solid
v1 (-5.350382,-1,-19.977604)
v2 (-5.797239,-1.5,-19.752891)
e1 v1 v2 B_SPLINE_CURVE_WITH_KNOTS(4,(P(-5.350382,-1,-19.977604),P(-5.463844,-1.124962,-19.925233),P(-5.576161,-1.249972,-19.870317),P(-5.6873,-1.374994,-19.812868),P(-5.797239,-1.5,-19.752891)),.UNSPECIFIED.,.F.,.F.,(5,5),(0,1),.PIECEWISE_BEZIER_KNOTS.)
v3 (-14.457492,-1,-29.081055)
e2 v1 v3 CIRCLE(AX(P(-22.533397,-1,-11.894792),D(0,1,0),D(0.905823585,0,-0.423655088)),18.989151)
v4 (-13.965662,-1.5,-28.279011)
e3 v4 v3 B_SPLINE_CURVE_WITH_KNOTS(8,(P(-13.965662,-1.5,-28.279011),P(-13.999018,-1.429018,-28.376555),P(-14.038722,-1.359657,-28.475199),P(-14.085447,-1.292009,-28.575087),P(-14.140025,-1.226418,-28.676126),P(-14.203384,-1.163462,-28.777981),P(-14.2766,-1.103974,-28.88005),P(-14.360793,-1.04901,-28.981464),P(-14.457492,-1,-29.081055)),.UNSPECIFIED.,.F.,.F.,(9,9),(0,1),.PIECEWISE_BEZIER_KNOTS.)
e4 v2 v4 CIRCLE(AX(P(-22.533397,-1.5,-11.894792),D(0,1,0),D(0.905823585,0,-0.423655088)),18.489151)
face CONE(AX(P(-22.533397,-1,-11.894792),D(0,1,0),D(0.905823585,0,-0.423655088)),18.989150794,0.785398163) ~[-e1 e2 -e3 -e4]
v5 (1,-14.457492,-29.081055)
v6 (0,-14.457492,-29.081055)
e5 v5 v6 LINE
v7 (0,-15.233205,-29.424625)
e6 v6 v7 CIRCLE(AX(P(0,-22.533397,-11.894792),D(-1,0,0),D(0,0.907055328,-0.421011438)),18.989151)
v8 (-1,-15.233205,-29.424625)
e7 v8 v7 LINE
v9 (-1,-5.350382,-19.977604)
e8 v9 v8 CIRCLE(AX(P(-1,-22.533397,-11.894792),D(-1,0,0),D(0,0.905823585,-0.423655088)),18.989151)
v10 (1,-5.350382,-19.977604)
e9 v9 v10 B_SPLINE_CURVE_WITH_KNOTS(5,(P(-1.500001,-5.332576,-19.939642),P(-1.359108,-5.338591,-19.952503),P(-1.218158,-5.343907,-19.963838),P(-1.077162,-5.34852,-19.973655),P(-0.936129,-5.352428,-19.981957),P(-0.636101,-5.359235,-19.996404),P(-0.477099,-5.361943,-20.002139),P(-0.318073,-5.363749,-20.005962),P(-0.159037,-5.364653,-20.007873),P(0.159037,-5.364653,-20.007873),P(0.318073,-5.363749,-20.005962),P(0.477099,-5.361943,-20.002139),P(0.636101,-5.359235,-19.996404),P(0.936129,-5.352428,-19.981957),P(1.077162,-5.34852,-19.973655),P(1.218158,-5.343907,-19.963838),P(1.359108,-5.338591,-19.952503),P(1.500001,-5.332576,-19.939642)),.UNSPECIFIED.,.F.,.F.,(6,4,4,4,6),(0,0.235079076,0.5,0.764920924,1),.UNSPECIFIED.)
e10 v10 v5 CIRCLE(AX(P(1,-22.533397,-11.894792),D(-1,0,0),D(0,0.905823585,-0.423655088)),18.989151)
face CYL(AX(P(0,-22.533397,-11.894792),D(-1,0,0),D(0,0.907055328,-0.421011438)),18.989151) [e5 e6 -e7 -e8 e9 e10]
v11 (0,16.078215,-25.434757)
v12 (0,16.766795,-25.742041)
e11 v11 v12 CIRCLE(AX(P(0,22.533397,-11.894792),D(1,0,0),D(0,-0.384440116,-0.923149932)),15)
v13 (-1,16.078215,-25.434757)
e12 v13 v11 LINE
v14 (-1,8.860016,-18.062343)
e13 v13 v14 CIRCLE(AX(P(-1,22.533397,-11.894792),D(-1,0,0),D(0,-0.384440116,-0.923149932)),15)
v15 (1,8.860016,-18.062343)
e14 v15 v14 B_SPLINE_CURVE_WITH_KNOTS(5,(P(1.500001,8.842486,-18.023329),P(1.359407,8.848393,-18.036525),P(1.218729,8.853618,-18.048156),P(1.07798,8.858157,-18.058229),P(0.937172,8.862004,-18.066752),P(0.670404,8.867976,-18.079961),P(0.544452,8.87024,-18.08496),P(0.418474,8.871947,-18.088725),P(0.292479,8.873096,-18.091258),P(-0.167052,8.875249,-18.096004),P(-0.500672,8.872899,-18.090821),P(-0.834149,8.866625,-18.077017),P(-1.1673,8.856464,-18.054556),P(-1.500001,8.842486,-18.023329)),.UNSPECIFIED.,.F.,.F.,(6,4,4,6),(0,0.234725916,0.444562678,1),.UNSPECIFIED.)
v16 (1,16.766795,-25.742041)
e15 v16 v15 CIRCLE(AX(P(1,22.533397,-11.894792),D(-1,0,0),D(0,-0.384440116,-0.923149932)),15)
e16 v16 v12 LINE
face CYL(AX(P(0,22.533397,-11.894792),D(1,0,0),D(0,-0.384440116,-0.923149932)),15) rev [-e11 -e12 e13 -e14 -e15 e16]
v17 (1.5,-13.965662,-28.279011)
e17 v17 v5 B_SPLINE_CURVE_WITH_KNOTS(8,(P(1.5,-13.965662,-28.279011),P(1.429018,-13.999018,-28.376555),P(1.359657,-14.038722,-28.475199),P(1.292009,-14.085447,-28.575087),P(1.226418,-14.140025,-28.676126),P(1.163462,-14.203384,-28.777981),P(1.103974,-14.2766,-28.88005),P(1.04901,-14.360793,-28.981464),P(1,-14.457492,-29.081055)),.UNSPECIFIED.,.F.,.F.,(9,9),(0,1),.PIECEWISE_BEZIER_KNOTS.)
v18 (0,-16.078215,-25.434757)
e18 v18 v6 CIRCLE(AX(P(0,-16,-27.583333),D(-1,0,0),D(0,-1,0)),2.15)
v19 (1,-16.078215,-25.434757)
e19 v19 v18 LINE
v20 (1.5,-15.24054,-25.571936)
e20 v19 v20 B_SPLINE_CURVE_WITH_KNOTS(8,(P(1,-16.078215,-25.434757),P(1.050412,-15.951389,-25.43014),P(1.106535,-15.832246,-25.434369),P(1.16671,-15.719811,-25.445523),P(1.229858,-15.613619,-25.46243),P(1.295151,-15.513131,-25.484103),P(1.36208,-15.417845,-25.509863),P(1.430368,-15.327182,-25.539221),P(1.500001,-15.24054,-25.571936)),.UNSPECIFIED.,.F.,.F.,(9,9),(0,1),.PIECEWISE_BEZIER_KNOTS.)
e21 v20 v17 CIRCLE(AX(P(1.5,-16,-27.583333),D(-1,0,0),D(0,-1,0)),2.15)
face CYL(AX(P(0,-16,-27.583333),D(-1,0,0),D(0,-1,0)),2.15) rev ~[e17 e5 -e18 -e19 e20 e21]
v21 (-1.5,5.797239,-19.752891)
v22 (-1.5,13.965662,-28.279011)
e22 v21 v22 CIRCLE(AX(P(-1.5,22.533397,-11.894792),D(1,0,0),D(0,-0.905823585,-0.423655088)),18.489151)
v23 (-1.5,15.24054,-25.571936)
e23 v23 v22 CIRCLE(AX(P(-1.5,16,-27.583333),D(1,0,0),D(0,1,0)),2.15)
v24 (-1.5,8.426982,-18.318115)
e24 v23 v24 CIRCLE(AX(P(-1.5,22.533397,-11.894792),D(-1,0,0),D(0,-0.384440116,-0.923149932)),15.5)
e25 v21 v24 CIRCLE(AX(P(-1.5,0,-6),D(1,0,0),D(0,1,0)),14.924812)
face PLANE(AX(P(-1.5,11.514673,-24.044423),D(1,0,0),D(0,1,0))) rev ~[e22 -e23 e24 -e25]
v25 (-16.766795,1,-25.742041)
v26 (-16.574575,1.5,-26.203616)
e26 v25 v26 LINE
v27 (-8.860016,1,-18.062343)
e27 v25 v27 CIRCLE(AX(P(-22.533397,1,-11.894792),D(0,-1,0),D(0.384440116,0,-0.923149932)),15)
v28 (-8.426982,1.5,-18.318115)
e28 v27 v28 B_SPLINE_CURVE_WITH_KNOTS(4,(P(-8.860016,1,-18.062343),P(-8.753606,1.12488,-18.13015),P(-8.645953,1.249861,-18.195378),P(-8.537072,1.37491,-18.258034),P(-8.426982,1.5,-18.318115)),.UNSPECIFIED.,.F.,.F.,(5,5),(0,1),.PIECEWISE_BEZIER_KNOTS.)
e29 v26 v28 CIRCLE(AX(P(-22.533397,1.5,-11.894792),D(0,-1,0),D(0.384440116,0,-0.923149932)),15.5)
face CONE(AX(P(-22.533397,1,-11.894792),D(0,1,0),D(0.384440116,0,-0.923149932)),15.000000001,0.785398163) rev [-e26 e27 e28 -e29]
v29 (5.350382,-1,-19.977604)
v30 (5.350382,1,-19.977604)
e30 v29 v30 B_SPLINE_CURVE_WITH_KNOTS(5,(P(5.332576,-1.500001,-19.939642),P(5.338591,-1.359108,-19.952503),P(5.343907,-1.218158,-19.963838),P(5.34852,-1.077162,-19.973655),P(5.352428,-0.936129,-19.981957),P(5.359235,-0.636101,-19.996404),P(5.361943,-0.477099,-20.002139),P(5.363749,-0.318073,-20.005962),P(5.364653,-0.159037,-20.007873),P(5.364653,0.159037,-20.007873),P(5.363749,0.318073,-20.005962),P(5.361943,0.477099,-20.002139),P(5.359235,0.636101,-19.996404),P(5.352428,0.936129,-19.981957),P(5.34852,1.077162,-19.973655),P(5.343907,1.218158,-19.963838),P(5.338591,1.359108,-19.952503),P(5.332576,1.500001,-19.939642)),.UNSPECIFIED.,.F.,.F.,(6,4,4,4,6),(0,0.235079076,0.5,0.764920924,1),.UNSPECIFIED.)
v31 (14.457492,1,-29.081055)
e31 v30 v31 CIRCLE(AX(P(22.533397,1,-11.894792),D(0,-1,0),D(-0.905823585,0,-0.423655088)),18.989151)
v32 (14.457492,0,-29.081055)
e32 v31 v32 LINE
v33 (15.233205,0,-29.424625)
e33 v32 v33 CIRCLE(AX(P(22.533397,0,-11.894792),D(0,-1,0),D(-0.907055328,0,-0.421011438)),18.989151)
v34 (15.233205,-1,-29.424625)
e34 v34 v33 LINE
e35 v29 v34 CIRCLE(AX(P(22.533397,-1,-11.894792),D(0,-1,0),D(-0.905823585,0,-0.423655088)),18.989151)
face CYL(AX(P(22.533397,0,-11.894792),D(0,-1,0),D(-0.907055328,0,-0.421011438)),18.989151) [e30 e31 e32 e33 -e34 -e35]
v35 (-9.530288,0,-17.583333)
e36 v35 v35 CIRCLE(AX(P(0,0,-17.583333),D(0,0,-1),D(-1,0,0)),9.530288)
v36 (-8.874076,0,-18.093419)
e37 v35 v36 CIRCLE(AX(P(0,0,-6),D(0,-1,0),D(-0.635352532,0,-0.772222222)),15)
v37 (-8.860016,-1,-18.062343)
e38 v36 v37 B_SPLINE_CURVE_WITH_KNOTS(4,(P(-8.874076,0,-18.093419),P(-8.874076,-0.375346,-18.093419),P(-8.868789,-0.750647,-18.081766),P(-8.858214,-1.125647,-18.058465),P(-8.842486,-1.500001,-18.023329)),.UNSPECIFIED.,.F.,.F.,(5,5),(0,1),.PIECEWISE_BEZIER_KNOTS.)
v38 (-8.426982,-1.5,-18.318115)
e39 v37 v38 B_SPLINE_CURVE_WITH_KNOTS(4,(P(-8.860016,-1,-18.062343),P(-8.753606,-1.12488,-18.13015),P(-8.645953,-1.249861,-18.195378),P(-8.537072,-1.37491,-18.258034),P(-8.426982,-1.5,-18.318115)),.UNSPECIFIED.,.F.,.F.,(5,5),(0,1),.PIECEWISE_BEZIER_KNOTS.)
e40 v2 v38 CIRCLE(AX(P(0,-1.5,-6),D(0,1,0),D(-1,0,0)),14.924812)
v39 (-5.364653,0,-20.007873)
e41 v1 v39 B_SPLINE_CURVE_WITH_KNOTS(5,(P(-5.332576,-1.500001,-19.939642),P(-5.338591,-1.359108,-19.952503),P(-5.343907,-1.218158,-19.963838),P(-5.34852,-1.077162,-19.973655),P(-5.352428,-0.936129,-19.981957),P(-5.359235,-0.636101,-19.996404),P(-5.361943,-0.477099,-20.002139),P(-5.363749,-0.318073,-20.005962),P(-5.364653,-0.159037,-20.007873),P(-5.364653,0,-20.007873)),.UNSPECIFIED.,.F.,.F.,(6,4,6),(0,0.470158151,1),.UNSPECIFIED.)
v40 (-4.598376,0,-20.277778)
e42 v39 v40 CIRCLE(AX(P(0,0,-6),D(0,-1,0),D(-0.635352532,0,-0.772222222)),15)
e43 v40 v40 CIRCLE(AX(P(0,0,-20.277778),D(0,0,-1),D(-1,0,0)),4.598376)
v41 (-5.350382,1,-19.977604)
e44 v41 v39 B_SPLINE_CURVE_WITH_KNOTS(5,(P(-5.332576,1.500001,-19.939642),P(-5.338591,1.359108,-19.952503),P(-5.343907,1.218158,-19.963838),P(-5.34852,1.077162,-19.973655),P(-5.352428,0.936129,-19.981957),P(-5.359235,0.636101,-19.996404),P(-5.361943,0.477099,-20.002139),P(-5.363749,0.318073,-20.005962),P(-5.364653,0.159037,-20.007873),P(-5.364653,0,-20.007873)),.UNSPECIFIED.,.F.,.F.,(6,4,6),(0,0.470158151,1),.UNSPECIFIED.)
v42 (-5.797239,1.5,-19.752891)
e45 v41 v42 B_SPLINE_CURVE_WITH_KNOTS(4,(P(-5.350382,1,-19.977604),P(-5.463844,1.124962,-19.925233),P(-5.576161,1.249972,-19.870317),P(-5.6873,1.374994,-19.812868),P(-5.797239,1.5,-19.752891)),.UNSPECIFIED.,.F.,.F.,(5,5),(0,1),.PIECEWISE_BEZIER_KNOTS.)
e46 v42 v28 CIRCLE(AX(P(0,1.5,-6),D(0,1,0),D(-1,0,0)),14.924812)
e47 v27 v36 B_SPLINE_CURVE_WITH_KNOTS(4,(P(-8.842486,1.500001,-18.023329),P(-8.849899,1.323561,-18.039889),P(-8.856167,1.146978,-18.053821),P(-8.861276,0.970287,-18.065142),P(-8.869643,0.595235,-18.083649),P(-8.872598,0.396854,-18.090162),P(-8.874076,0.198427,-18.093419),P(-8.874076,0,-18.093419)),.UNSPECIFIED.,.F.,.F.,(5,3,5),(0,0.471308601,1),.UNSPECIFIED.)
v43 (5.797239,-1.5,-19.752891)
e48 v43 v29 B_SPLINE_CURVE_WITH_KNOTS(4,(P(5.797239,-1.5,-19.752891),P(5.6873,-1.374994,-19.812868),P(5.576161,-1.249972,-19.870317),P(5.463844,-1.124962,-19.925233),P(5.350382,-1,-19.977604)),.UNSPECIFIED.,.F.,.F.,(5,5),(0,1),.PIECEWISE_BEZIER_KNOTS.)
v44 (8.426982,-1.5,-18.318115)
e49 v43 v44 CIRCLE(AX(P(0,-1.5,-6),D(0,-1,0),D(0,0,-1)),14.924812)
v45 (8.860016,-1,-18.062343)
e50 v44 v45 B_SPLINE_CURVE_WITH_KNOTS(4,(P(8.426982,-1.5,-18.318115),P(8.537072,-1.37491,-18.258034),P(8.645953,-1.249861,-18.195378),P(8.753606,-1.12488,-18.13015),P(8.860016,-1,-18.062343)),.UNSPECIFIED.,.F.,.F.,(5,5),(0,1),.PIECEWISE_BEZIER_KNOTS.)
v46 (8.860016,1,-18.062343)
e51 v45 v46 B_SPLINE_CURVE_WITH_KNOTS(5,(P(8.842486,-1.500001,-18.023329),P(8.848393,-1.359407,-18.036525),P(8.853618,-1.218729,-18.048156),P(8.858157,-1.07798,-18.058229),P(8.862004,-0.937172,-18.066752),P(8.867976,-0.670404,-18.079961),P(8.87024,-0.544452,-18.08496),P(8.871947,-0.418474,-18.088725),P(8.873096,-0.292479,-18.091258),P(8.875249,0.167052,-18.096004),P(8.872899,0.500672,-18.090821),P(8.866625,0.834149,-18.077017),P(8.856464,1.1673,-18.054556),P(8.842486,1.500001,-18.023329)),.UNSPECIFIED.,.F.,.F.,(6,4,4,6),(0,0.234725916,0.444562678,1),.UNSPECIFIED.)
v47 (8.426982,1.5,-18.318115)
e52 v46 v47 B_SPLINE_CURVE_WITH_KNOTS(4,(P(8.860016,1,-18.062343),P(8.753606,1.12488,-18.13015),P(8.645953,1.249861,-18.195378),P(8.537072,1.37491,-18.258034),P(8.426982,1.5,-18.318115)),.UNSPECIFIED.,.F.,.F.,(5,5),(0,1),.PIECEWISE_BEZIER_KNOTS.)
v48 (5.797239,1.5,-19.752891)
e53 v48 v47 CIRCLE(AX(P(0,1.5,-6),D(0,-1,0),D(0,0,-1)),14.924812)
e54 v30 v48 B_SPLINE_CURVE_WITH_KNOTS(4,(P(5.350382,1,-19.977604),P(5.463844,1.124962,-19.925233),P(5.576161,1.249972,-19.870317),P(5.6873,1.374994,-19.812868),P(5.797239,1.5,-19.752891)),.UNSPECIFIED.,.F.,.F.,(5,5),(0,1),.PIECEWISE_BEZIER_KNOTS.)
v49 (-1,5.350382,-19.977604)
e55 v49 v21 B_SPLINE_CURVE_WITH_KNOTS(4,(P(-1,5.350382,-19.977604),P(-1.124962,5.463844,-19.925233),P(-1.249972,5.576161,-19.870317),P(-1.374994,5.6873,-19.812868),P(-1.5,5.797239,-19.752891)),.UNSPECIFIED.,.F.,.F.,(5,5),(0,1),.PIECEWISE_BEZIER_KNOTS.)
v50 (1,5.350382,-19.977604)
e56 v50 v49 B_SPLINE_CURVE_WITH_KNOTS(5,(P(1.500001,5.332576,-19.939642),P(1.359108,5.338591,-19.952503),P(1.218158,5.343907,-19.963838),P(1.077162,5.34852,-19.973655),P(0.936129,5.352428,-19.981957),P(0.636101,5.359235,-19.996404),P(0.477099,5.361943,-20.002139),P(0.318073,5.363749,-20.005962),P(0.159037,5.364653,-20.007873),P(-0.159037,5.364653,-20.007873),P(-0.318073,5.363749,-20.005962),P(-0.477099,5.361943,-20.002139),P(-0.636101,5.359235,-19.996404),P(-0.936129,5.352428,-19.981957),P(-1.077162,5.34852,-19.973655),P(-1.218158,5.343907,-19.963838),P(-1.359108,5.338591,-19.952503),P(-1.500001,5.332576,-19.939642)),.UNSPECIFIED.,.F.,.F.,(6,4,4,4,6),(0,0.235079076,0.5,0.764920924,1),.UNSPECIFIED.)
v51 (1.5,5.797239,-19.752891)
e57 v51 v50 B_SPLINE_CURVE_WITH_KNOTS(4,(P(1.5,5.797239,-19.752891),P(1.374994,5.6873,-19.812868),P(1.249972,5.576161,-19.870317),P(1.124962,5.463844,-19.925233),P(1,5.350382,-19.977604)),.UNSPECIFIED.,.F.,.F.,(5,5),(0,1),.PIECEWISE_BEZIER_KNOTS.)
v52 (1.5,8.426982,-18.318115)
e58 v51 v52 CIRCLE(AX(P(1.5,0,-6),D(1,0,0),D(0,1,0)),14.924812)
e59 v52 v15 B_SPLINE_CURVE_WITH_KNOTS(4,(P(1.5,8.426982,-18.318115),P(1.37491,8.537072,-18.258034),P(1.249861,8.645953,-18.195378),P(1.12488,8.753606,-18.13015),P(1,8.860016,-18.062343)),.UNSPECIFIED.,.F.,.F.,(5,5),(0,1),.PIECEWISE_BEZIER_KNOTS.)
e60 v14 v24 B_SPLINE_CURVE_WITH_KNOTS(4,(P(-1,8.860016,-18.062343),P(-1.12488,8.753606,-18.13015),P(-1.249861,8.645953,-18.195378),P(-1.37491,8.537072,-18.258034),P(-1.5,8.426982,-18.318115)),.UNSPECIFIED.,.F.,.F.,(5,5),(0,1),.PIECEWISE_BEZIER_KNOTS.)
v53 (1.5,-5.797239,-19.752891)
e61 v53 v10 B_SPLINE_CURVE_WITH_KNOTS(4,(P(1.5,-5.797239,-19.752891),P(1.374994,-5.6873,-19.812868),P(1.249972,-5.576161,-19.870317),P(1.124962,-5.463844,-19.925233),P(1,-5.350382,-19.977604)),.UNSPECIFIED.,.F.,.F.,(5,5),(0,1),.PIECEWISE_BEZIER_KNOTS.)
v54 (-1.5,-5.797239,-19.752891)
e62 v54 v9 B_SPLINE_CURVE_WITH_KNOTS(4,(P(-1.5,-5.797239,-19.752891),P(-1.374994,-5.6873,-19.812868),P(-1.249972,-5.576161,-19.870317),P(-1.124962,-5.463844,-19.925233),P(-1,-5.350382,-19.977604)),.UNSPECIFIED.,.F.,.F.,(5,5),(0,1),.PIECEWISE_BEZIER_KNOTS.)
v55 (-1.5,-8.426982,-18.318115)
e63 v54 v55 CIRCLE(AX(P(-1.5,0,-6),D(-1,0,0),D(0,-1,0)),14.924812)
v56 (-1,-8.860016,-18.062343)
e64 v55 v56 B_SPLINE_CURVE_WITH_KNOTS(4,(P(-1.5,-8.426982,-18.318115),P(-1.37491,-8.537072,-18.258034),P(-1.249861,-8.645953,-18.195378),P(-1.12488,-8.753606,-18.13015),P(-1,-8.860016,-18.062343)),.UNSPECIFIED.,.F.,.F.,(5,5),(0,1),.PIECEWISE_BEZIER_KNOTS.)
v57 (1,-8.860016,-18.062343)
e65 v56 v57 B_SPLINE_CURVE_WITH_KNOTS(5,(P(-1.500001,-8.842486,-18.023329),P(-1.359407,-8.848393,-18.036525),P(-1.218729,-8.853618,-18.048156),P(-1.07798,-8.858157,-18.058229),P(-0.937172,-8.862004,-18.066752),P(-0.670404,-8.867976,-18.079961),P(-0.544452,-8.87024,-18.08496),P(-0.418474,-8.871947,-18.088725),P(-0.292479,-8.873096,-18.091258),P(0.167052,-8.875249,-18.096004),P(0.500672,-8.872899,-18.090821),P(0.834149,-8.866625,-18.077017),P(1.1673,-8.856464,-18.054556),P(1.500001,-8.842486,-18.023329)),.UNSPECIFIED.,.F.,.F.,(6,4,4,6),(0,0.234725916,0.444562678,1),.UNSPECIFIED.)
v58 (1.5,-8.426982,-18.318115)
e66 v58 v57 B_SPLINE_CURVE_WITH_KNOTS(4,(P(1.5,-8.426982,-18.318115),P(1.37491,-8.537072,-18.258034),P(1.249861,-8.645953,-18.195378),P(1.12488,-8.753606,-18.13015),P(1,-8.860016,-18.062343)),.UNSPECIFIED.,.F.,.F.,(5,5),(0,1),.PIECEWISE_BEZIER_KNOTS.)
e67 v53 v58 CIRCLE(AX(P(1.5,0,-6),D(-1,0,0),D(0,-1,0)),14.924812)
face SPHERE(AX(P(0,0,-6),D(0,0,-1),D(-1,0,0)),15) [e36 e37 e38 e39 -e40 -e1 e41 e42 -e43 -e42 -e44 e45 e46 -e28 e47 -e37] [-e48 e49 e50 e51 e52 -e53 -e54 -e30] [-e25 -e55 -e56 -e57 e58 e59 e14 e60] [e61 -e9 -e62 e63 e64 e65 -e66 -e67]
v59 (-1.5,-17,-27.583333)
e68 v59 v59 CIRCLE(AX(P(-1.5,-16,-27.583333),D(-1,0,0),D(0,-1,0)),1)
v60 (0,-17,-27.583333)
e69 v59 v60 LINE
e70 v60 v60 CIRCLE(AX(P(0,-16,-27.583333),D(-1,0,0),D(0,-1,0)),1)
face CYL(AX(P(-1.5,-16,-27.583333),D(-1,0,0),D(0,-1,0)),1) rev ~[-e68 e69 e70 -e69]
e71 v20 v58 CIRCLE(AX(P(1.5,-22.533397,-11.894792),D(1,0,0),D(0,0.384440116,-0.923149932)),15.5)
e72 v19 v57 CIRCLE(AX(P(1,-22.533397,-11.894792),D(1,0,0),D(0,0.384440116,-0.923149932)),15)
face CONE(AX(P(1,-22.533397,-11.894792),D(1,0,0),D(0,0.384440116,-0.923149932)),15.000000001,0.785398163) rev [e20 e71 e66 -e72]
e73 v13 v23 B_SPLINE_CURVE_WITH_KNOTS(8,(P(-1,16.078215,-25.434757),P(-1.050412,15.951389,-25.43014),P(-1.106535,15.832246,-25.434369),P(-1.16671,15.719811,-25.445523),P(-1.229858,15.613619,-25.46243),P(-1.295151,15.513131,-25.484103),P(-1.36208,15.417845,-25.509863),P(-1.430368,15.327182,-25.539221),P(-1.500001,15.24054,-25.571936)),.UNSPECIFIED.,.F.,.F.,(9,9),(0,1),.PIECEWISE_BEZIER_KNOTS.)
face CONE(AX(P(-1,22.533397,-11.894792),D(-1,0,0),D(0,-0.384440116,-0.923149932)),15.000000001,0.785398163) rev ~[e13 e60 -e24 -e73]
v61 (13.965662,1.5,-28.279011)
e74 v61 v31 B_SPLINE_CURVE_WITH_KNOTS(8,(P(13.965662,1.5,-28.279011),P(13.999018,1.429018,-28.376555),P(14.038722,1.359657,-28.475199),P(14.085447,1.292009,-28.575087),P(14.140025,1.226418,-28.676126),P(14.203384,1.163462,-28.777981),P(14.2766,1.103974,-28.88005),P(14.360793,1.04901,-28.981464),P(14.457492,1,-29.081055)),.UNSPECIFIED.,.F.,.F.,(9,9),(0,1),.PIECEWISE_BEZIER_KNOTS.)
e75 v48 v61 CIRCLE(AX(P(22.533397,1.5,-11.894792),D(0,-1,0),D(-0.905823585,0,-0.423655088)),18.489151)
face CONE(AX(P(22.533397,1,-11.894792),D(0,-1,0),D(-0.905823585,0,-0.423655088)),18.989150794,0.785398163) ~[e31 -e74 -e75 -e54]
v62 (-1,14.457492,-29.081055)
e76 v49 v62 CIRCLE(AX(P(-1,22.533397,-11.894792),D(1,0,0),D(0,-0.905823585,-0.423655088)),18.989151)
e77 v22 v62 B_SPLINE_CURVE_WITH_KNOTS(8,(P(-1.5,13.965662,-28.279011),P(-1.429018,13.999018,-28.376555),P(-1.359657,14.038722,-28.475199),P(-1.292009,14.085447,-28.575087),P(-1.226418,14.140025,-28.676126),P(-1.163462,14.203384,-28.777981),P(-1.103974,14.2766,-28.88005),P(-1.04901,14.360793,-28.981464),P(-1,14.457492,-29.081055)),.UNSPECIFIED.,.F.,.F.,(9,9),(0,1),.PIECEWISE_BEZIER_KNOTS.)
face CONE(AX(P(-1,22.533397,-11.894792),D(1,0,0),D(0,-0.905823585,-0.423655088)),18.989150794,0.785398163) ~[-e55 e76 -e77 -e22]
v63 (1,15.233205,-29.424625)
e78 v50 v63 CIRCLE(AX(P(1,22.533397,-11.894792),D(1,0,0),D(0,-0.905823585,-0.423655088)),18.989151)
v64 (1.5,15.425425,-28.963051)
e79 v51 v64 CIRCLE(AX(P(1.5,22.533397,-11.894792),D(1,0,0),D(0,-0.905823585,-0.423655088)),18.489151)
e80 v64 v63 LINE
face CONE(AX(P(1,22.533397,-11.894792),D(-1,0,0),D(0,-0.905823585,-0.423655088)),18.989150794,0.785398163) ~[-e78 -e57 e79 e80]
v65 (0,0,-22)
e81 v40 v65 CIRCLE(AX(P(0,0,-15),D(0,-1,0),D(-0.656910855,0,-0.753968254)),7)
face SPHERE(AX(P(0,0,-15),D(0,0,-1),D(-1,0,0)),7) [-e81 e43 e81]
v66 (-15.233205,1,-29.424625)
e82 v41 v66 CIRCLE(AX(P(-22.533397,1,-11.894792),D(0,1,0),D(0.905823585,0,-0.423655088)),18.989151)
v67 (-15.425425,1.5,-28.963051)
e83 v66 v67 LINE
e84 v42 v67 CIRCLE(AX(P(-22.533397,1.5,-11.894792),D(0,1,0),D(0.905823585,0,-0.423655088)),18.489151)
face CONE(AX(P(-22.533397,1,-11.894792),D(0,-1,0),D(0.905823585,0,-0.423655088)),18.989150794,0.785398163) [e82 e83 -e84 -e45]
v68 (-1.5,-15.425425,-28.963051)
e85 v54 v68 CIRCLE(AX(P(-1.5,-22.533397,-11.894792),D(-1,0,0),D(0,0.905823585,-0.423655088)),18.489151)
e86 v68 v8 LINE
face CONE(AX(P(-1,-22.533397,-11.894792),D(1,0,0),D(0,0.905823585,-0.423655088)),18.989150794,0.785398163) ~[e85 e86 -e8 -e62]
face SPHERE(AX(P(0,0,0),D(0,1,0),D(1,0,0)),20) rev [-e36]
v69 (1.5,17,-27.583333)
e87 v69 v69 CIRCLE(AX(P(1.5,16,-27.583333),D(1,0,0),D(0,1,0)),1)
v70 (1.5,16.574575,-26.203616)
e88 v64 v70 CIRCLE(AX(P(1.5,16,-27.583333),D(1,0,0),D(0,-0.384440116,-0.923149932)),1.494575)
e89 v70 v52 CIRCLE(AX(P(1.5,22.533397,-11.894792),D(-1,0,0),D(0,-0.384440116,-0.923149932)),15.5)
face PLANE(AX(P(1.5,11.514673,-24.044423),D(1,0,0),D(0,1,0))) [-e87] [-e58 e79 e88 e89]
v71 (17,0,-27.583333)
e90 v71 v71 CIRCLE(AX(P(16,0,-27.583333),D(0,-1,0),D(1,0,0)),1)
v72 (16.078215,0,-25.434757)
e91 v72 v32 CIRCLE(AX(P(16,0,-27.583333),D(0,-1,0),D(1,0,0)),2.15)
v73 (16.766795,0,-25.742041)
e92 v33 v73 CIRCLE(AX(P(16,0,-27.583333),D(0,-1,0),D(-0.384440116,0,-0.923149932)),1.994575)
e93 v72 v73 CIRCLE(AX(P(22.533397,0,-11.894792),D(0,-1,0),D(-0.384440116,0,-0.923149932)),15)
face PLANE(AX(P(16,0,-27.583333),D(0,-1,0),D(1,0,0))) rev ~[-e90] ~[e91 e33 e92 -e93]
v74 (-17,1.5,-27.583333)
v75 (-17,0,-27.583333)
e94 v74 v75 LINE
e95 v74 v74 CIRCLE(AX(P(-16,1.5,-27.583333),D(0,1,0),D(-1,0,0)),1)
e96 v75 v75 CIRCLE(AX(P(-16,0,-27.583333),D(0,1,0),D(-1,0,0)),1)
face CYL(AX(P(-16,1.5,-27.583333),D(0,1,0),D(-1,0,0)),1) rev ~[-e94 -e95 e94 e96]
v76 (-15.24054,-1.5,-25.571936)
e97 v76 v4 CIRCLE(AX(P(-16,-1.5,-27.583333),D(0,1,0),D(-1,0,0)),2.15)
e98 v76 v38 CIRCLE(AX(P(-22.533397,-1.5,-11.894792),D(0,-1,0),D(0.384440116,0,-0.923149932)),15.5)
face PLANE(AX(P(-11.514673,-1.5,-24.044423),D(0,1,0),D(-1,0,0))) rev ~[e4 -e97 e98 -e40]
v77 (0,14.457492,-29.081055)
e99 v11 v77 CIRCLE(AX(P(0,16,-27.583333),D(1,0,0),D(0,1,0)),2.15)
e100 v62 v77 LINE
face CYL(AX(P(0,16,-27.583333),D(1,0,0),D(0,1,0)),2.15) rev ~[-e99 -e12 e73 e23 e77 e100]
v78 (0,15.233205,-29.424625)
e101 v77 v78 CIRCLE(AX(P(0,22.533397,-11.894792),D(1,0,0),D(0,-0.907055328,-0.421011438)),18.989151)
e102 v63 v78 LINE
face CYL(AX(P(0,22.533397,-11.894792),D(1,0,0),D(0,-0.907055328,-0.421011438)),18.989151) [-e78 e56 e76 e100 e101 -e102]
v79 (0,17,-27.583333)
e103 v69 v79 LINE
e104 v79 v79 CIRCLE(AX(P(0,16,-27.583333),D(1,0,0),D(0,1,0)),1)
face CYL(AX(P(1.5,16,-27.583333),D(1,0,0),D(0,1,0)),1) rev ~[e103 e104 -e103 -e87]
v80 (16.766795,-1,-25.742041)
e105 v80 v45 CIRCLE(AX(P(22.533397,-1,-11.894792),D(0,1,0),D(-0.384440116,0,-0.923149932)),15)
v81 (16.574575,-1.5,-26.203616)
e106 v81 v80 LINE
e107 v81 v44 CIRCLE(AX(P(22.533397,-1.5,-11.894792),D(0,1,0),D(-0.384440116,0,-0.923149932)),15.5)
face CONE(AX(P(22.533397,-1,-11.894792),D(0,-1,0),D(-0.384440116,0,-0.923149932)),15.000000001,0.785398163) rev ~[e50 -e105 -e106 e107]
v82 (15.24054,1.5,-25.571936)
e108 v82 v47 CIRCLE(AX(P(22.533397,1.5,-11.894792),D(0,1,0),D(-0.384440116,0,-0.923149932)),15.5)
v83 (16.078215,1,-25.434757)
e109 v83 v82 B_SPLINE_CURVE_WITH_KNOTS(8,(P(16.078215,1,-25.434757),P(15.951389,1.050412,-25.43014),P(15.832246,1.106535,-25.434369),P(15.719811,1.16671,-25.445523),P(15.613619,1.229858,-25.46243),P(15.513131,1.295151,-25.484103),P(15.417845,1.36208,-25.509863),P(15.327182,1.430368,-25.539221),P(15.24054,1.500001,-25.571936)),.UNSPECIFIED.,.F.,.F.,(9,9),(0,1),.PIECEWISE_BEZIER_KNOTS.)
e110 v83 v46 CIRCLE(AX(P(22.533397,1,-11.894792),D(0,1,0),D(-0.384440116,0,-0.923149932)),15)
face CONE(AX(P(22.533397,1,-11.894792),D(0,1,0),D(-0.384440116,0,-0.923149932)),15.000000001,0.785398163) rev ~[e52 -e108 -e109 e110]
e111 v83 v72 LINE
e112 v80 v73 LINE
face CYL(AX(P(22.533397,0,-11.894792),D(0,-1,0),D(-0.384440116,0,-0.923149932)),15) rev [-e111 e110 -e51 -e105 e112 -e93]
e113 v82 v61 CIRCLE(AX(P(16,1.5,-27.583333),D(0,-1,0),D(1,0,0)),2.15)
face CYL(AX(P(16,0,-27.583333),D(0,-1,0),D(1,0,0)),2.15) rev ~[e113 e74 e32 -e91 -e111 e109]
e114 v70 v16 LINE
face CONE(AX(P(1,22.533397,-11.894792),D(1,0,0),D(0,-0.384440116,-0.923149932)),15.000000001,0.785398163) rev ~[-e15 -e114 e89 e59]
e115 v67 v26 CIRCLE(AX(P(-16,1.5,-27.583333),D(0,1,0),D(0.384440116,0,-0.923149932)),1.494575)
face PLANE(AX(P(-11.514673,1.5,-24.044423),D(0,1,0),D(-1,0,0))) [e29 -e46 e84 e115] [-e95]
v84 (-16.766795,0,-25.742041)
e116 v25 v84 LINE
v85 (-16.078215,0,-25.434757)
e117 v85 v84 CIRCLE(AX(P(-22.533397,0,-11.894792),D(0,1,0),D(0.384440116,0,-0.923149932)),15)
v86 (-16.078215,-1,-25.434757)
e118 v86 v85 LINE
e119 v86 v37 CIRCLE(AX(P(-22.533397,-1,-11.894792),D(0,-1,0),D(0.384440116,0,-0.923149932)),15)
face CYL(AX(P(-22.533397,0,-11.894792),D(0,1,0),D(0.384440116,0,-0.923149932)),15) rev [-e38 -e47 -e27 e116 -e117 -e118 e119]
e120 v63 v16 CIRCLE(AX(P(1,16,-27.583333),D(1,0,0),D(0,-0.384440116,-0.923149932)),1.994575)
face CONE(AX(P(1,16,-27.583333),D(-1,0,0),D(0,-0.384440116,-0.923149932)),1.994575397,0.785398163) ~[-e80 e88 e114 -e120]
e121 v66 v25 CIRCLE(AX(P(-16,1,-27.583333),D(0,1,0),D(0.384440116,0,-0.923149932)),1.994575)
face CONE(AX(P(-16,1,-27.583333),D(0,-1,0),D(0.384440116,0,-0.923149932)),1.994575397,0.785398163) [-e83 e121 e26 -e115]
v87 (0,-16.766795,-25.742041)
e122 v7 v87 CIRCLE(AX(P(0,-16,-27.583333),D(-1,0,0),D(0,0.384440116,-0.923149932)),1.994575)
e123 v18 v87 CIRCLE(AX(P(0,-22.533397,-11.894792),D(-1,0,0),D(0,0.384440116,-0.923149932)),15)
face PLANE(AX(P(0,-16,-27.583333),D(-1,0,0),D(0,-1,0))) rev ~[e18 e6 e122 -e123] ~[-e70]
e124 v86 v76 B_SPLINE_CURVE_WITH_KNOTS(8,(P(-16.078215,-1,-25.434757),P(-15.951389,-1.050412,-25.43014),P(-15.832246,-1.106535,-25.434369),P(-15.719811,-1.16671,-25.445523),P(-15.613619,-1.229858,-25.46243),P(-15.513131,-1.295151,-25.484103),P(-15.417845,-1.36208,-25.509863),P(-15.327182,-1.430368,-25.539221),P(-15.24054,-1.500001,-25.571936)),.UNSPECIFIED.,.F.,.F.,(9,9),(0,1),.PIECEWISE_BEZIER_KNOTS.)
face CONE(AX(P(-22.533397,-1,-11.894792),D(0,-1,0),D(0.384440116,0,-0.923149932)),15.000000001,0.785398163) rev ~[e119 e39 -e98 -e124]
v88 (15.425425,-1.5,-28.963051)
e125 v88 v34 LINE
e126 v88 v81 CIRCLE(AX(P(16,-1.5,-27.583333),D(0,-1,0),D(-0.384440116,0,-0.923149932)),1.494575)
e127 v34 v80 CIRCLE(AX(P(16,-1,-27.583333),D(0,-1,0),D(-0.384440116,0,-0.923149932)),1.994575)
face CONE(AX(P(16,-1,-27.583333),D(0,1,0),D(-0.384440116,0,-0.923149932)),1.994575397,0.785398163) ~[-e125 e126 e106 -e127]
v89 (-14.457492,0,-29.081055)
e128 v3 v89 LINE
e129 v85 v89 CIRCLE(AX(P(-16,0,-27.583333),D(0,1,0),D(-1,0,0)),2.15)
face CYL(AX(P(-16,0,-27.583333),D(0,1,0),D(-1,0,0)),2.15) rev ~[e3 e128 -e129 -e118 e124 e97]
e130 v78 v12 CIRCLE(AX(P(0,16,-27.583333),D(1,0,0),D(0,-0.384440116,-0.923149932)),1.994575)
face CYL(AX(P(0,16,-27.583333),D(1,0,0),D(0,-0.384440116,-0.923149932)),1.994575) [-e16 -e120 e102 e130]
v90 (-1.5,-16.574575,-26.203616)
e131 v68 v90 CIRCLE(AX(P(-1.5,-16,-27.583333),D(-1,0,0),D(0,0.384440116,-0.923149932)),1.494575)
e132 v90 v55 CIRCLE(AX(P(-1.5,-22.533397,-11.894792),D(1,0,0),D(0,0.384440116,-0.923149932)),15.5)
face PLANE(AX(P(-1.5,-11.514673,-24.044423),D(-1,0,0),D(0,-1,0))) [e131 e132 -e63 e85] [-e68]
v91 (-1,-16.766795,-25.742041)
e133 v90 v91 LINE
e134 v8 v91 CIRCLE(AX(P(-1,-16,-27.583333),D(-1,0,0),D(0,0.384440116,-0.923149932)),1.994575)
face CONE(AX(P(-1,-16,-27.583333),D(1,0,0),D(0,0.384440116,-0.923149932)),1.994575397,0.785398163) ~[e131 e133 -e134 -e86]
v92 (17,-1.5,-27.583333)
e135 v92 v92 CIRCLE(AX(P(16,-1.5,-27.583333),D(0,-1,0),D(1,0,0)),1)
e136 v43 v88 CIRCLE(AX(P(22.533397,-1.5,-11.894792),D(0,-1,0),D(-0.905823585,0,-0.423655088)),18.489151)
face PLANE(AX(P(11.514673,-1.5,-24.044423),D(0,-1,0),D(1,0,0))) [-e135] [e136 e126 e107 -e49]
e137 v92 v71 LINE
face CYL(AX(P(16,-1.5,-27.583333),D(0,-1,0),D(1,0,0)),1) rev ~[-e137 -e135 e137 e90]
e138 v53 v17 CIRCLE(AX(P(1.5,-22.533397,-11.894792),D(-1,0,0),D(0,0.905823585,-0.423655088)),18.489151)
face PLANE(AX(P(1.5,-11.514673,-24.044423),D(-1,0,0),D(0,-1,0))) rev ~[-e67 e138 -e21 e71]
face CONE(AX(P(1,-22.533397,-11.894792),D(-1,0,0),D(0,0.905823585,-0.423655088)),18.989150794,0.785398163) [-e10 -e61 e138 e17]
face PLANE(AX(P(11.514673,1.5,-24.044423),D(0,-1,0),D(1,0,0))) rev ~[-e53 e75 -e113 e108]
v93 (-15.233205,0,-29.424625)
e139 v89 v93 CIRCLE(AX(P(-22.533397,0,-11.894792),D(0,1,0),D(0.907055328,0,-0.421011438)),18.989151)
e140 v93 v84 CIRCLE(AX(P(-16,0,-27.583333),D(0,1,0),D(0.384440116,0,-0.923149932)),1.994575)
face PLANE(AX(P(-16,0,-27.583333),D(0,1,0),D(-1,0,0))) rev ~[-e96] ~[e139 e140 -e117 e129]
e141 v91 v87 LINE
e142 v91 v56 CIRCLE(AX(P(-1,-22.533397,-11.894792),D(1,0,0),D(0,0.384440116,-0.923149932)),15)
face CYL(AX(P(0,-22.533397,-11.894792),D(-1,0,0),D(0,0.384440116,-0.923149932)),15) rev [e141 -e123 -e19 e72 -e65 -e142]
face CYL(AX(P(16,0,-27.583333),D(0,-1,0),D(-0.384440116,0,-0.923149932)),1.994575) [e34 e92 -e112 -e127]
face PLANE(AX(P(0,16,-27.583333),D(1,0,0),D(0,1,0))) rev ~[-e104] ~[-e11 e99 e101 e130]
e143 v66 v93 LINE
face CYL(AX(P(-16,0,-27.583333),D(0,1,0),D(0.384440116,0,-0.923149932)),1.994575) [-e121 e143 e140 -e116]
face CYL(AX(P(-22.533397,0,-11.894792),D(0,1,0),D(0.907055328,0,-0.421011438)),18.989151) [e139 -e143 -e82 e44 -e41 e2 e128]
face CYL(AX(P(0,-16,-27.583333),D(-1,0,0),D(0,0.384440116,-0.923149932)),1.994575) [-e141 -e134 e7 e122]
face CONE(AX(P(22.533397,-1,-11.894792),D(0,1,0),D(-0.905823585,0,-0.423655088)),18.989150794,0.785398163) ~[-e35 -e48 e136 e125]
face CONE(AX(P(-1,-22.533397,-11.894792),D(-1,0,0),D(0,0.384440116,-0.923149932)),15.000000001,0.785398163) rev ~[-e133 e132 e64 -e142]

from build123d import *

# Parameters (mm, degrees)
F7_DEPTH         = 1.5
F7_COPIES_COUNT  = 4
F8_SIZE          = 0.5
F9_R             = 2.15
F10_DEPTH        = 1.5
F10_COPIES_COUNT = 4
F11_R            = 1
F12_DEPTH        = 3
F12_COPIES_COUNT = 4


# Not quite as in the source:
# - a pattern or mirror of a feature is missing from the dataset's text; its kind, count and spacing are read off the source's solid


with BuildPart() as f1:
    # F0 (on Top) → F1 (revolve)
    with BuildSketch(Plane.XY):
        with BuildLine():
            Line((0, -20), (0, 20))
            ThreePointArc((0, 20), (-20, 0), (0, -20))
        make_face()
    revolve(axis=Axis((0, 0, 0), (0, -1, 0)))

    # F2 (on Front) → F3 (revolve)
    with BuildSketch(Plane.XZ):
        with BuildLine():
            ThreePointArc((-4.5983759881, -20.2777777778), (-5.1275841713, -19.7652786452), (-5.6, -19.2))
            ThreePointArc((-5.6, -19.2), (-7.6082065121, -18.4963562268), (-9.5302879751, -17.5833333333))
            ThreePointArc((-9.5302879751, -17.5833333333), (-7.1916475208, -19.1635939597), (-4.5983759881, -20.2777777778))
        make_face()
        with BuildLine():
            Line((0, -21), (0, -20))
            ThreePointArc((0, -20), (-2.8284271247, -19.7989898732), (-5.6, -19.2))
            ThreePointArc((-5.6, -19.2), (-5.1275841713, -19.7652786452), (-4.5983759881, -20.2777777778))
            ThreePointArc((-4.5983759881, -20.2777777778), (-2.3273733406, -20.8183444869), (0, -21))
        make_face()
        with BuildLine():
            Line((0, -22), (0, -21))
            ThreePointArc((0, -21), (-2.3273733406, -20.8183444869), (-4.5983759881, -20.2777777778))
            ThreePointArc((-4.5983759881, -20.2777777778), (-2.4551533104, -21.5553201464), (0, -22))
        make_face()
    revolve(axis=Axis((0, 0, -21), (0, 0, -1)))

    # F4 (on Top) → F5 (revolve, cut)
    with BuildSketch(Plane.XY):
        with BuildLine():
            ThreePointArc((0, -20), (20, 0), (0, 20))
            Line((0, 20), (0, -20))
        make_face()
    revolve(axis=Axis((0, 0, 0), (0, -1, 0)), mode=Mode.SUBTRACT)

    # F6 (on Front) → F7 (join, symmetric)
    with BuildSketch(Plane.XZ):
        with BuildLine():
            ThreePointArc((16.7667947961, -25.7420411911), (12.0468652107, -22.6201202145), (8.8194778429, -17.9716692195))
            Line((8.8194778429, -17.9716692195), (5.3091861203, -19.8894418917))
            ThreePointArc((5.3091861203, -19.8894418917), (9.3769721823, -25.5877227261), (15.2332052039, -29.4246254756))
            ThreePointArc((15.2332052039, -29.4246254756), (17.8412921423, -28.3501281294), (16.7667947961, -25.7420411911))
        make_face()
    f7 = extrude(amount=F7_DEPTH, both=True)

    # F7_copies: F7 ×4 about axis
    f7_copies_axis = Axis((0, 0, 0), (0, 0, 1))
    for i in range(1, F7_COPIES_COUNT):
        add(f7.rotate(f7_copies_axis, i * 360 / F7_COPIES_COUNT))

    # F8
    f8_edges = [f1.edges().sort_by_distance(p)[0] for p in [
        (9.396954, 1.5, -25.606894),
        (17.841292, 1.5, -28.350128),
        (12.067102, 1.5, -22.639869),
        (12.067102, -1.5, -22.639869),
        (17.841292, -1.5, -28.350128),
        (9.396954, -1.5, -25.606894),
        (-12.067102, 1.5, -22.639869),
        (-12.067102, -1.5, -22.639869),
        (-9.396954, 1.5, -25.606894),
        (-17.841292, 1.5, -28.350128),
        (-9.396954, -1.5, -25.606894),
        (1.5, 9.396954, -25.606894),
        (-1.5, 9.396954, -25.606894),
        (1.5, 12.067102, -22.639869),
        (1.5, 17.841292, -28.350128),
        (-1.5, 12.067102, -22.639869),
        (-1.5, -9.396954, -25.606894),
        (1.5, -9.396954, -25.606894),
        (1.5, -12.067102, -22.639869),
        (-1.5, -12.067102, -22.639869),
        (-1.5, -17.841292, -28.350128),
    ]]
    chamfer(f8_edges, length=F8_SIZE)

    # F9 (on Front) → F10 (cut, through all)
    with BuildSketch(Plane.XZ):
        with Locations((16, -27.5833333333)):
            Circle(F9_R)
    f10 = extrude(amount=-F10_DEPTH, mode=Mode.SUBTRACT)

    # F10_copies: F10 ×4 about axis
    f10_copies_axis = Axis((0, 0, 0), (0, 0, 1))
    for i in range(1, F10_COPIES_COUNT):
        add(f10.rotate(f10_copies_axis, i * 360 / F10_COPIES_COUNT), mode=Mode.SUBTRACT)

    # F11 (on face) → F12 (cut, through all)
    with BuildSketch(Plane.XZ.offset(1.5)):
        with Locations((16, -27.5833333333)):
            Circle(F11_R)
    f12 = extrude(amount=-F12_DEPTH, mode=Mode.SUBTRACT)

    # F12_copies: F12 ×4 about axis
    f12_copies_axis = Axis((0, 0, 0), (0, 0, 1))
    for i in range(1, F12_COPIES_COUNT):
        add(f12.rotate(f12_copies_axis, i * 360 / F12_COPIES_COUNT), mode=Mode.SUBTRACT)


solid = f1.part
